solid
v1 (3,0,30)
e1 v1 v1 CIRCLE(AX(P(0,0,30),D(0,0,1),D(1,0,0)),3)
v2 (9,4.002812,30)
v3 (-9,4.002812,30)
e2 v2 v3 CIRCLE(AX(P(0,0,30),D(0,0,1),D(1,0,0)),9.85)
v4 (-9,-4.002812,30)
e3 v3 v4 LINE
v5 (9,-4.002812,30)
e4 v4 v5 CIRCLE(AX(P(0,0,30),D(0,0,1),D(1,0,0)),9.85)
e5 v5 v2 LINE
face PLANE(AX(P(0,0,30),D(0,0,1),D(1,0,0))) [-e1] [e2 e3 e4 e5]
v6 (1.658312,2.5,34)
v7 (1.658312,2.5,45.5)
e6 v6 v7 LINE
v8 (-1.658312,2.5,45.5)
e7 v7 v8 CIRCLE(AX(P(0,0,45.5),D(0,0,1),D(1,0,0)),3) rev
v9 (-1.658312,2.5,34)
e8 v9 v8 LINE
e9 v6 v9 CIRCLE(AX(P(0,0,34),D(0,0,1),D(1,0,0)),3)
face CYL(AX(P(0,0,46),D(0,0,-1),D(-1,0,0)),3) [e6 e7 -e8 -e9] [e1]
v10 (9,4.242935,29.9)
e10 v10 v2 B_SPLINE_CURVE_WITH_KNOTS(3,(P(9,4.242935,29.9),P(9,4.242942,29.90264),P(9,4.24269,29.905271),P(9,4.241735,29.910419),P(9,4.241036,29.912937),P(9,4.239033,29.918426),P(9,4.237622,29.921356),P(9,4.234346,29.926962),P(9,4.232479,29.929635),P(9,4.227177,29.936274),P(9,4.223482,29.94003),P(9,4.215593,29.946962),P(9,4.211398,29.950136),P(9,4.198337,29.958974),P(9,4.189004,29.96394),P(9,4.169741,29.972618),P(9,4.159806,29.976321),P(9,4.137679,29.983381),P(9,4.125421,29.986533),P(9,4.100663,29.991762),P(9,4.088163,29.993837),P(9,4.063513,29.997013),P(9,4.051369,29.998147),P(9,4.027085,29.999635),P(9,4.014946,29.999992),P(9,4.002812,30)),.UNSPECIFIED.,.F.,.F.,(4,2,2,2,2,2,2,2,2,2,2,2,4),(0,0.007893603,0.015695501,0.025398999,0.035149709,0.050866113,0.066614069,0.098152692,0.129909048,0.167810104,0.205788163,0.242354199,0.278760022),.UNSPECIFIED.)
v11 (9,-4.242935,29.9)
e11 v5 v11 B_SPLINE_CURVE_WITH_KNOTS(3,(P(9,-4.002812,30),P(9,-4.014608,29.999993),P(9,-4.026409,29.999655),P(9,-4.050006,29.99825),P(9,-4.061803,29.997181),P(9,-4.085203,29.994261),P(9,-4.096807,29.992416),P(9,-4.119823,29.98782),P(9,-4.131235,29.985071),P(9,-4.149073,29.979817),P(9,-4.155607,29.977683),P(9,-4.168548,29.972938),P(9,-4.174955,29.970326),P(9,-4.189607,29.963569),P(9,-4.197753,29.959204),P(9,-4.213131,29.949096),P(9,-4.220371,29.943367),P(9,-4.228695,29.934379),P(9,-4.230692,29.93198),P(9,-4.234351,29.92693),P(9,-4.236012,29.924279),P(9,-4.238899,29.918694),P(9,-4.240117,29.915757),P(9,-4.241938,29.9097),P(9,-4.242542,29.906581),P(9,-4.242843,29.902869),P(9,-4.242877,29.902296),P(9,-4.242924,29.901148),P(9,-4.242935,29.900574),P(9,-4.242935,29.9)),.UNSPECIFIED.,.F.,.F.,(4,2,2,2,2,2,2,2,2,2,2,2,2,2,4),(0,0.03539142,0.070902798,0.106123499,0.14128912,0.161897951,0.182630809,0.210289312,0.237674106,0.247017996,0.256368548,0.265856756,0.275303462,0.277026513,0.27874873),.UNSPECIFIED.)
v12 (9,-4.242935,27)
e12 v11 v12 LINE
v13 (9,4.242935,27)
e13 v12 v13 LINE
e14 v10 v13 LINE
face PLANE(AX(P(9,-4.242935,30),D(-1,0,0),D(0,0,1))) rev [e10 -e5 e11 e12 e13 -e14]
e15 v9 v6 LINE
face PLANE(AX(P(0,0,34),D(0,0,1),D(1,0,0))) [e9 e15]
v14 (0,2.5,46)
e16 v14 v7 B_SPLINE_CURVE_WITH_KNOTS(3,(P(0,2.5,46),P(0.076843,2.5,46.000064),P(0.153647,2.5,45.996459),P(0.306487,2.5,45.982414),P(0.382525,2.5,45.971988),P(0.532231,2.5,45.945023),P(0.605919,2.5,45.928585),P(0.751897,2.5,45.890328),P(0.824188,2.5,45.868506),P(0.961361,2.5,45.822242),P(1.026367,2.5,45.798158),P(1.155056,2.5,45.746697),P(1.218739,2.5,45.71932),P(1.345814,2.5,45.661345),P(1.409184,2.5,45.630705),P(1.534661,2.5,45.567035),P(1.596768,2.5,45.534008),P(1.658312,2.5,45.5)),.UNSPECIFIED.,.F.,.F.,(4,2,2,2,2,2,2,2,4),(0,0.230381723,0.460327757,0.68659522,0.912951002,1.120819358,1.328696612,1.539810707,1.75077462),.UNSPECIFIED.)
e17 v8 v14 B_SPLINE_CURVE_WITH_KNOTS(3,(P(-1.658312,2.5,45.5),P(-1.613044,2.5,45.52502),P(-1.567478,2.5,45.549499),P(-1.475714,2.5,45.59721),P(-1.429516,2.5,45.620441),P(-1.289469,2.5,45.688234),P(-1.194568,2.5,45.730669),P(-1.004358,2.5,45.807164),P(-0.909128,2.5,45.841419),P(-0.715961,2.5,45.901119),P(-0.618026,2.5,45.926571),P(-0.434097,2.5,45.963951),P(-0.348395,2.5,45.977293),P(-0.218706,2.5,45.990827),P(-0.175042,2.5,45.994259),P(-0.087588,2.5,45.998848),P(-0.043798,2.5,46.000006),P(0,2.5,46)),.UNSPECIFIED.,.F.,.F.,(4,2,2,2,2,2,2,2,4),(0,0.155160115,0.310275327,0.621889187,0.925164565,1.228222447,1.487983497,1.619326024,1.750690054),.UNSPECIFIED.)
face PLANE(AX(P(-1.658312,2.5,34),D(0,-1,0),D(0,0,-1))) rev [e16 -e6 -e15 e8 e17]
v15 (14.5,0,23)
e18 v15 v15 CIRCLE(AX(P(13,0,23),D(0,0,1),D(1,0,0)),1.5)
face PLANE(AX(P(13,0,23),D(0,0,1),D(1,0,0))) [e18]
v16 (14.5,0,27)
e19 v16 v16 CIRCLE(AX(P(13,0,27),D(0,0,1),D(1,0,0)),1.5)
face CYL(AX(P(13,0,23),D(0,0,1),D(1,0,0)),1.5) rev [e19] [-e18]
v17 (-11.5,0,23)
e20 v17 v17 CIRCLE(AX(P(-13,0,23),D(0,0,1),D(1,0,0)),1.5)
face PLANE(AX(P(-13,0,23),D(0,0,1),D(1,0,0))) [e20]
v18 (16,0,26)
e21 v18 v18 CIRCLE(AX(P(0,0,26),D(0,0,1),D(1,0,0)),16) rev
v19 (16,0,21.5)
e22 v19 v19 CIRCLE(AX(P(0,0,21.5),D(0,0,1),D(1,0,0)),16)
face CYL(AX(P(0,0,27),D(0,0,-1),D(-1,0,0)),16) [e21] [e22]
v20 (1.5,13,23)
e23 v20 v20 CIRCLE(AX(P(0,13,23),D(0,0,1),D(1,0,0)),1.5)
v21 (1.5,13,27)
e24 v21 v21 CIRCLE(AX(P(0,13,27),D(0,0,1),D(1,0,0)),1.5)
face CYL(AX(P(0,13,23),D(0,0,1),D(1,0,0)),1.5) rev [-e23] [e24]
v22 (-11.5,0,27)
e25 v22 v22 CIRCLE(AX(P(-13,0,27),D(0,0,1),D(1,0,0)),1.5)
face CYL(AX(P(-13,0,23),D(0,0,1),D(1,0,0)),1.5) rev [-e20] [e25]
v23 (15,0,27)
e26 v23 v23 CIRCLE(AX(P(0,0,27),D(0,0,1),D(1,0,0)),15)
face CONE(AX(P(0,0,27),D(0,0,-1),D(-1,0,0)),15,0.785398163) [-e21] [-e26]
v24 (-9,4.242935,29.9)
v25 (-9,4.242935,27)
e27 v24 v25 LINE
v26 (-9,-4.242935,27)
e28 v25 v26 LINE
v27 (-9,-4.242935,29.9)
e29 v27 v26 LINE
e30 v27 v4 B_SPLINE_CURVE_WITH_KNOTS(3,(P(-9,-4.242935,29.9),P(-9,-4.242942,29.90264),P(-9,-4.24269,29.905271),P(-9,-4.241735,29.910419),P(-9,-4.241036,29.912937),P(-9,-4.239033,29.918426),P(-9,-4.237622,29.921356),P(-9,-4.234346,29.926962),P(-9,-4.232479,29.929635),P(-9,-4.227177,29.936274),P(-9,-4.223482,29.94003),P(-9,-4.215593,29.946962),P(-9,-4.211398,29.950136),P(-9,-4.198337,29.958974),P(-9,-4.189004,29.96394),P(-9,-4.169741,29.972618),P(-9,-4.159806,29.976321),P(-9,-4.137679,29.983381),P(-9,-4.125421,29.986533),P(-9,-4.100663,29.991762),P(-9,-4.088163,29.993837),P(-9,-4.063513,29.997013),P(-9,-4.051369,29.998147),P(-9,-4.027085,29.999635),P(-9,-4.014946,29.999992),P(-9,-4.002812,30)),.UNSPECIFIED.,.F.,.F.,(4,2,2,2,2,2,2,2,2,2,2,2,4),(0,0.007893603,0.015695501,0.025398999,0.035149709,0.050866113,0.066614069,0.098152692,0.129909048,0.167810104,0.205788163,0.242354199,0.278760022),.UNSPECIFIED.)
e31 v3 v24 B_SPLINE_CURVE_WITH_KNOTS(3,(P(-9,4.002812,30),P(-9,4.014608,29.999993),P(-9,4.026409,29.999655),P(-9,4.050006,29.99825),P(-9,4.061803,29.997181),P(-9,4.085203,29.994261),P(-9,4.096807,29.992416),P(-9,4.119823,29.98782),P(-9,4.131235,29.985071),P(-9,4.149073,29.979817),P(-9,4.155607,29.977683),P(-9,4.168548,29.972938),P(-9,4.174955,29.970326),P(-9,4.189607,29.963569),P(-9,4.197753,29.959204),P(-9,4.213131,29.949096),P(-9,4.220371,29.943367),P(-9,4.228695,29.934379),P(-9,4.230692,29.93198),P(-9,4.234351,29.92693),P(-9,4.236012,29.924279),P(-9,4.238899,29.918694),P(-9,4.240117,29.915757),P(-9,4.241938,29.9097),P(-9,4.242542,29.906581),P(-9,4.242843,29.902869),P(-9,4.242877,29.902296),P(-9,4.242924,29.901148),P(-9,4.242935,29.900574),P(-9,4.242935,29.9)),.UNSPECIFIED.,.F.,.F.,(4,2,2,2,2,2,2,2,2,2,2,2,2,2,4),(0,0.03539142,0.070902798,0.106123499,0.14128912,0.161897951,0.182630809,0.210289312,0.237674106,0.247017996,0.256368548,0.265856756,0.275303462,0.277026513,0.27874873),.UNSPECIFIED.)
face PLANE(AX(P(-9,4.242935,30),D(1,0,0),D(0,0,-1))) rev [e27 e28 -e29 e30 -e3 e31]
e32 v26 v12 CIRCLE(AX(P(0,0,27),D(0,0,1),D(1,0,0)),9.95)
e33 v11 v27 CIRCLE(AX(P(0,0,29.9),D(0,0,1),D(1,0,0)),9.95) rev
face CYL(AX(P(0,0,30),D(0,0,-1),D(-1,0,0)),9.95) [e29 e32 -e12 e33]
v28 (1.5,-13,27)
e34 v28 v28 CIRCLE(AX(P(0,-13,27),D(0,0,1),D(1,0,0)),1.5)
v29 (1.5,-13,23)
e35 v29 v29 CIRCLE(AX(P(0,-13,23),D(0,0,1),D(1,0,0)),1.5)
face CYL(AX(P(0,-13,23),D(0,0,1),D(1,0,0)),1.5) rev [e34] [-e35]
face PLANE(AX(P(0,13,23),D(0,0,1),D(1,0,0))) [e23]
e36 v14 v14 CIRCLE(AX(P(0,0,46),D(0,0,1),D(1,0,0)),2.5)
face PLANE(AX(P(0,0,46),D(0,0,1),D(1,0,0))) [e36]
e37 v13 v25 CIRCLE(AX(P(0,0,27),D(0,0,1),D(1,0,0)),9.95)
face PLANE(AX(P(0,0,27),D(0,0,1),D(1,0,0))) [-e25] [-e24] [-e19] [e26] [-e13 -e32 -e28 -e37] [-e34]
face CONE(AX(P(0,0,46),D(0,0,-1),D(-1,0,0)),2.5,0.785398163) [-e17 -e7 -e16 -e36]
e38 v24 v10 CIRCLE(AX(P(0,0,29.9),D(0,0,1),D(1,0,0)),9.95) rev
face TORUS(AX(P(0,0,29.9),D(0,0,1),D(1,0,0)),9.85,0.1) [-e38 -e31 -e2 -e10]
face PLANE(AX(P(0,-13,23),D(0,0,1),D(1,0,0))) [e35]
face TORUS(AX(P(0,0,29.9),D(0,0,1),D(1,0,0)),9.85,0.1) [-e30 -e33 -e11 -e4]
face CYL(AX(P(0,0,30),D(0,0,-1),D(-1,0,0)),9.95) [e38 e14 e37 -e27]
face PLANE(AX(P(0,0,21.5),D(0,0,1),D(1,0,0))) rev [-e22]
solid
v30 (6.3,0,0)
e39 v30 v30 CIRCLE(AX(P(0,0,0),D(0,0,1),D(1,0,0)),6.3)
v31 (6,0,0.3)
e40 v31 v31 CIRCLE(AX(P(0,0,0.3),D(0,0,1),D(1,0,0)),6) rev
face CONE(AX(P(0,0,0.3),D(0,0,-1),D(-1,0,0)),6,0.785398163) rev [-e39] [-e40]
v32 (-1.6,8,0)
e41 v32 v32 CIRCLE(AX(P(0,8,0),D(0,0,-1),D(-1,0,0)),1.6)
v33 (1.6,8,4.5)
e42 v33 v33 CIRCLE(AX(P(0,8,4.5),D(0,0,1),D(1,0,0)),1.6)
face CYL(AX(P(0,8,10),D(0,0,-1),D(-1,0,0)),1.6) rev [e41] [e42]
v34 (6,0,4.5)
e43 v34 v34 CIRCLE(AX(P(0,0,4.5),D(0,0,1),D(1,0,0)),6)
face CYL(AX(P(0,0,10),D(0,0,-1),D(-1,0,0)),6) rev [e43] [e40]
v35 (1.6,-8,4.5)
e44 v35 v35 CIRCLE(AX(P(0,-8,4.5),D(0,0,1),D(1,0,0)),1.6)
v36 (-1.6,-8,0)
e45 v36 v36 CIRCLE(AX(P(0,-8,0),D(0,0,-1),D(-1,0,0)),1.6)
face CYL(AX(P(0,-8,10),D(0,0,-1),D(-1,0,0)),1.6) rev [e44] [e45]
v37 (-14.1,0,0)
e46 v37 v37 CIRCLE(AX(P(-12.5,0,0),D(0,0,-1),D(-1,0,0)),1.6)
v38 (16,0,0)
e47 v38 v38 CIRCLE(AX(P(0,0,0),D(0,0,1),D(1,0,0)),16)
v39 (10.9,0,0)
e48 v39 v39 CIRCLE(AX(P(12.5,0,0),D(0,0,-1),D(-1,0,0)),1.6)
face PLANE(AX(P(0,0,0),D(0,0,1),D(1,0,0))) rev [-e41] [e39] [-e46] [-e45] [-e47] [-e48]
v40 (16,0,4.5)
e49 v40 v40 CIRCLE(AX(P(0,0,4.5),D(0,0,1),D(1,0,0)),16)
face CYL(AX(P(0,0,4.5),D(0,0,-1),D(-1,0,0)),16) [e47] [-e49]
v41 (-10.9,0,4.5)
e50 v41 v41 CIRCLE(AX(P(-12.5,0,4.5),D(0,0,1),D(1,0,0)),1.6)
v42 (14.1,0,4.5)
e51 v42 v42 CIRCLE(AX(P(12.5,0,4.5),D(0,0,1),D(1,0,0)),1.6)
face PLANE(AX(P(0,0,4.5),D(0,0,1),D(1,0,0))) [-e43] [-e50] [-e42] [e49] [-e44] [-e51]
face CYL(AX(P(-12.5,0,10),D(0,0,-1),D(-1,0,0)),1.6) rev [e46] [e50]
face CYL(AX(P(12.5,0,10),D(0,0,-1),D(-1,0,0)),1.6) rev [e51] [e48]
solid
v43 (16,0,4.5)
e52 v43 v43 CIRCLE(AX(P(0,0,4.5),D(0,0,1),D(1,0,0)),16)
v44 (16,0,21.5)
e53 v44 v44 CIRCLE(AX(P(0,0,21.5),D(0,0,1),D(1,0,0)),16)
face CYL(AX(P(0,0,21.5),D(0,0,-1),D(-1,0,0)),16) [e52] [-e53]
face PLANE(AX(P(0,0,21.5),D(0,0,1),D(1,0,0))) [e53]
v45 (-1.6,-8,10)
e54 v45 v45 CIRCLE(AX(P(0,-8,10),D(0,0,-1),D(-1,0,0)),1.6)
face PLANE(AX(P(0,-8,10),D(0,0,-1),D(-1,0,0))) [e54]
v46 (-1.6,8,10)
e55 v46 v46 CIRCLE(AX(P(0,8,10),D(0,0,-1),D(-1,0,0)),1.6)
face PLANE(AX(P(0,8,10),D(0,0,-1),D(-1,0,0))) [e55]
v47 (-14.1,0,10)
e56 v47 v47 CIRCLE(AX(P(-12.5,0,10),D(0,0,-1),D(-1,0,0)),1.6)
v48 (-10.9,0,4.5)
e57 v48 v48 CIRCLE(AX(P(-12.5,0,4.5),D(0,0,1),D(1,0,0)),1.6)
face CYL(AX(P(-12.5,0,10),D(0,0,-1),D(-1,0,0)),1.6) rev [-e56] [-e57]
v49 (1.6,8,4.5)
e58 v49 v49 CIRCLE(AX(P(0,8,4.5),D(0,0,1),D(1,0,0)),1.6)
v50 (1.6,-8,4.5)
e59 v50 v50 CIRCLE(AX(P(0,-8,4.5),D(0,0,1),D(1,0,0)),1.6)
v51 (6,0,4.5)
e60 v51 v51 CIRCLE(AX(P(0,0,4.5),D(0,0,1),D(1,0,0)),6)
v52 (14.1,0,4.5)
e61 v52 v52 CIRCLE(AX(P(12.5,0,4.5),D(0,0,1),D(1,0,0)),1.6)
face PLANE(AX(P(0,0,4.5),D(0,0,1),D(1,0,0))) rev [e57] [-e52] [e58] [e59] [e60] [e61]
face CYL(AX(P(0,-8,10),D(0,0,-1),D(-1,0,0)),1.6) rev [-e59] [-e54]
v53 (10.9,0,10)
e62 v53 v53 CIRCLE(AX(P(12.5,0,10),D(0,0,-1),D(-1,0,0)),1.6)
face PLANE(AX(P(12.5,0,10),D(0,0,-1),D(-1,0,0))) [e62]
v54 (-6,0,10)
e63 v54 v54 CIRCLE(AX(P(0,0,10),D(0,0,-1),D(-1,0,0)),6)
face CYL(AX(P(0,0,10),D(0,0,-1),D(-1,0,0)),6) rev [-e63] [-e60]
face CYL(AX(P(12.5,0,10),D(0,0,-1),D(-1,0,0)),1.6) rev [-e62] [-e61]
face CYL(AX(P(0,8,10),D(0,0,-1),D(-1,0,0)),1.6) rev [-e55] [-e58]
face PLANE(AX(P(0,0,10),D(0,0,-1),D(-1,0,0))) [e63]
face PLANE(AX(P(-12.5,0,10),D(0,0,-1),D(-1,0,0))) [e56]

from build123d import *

# Parameters (mm, degrees)
SKETCH_1_R          = 16
EXTRUDE_1_DEPTH     = 4.5
SKETCH_2_R          = 16
EXTRUDE_2_DEPTH     = 17
SKETCH_3_R          = 16
EXTRUDE_3_DEPTH     = 5.5
CHAMFER_1_SIZE      = 1
EXTRUDE_4_DEPTH     = 3
FILLET_1_R          = 0.1
SKETCH_5_R          = 3
EXTRUDE_5_DEPTH     = 16
CUT_EXTRUDE_1_DEPTH = 12
CHAMFER_2_SIZE      = 0.5
SKETCH_7_R          = 1.5
CUT_EXTRUDE_2_DEPTH = 4
SKETCH_8_R          = 6
SKETCH_8_R_2        = 1.6
CUT_EXTRUDE_3_DEPTH = 10
CHAMFER_3_SIZE      = 0.3


with BuildPart() as part:
    # ｽｹｯﾁ1 → ﾎﾞｽ - 押し出し1 (new body)
    with BuildSketch(Plane.XY):
        Circle(SKETCH_1_R)
    extrude(amount=EXTRUDE_1_DEPTH)


with BuildPart() as body_2:
    # ｽｹｯﾁ2 → ﾎﾞｽ - 押し出し2 (new body)
    with BuildSketch(Plane.XY.offset(4.5)):
        Circle(SKETCH_2_R)
    extrude(amount=EXTRUDE_2_DEPTH)


with BuildPart() as body_3:
    # ｽｹｯﾁ3 → ﾎﾞｽ - 押し出し3 (new body)
    with BuildSketch(Plane.XY.offset(21.5)):
        Circle(SKETCH_3_R)
    extrude(amount=EXTRUDE_3_DEPTH)

    # 面取り1
    chamfer_1_edges = [body_3.edges().sort_by_distance(p)[0] for p in [
        (-16, 0, 27),
    ]]
    chamfer(chamfer_1_edges, length=CHAMFER_1_SIZE)

    # ｽｹｯﾁ4 → ﾎﾞｽ - 押し出し4 (add)
    with BuildSketch(Plane.XY.offset(27)):
        with BuildLine():
            Line((-9, 4.242935305), (-9, -4.242935305))
            ThreePointArc((-9, -4.242935305), (0, -9.95), (9, -4.242935305))
            Line((9, -4.242935305), (9, 4.242935305))
            ThreePointArc((9, 4.242935305), (0, 9.95), (-9, 4.242935305))
        make_face()
    extrude(amount=EXTRUDE_4_DEPTH)

    # ﾌｨﾚｯﾄ1
    fillet_1_edges = [body_3.edges().sort_by_distance(p)[0] for p in [
        (0, 9.95, 30),
        (0, -9.95, 30),
    ]]
    fillet(fillet_1_edges, radius=FILLET_1_R)

    # ｽｹｯﾁ5 → ﾎﾞｽ - 押し出し5 (add)
    with BuildSketch(Plane.XY.offset(30)):
        Circle(SKETCH_5_R)
    extrude(amount=EXTRUDE_5_DEPTH)

    # ｽｹｯﾁ6 → ｶｯﾄ - 押し出し1 (cut)
    with BuildSketch(Plane.XY.offset(46)):
        with BuildLine():
            Line((-1.658312395, 2.5), (1.658312395, 2.5))
            ThreePointArc((1.658312395, 2.5), (0, 3), (-1.658312395, 2.5))
        make_face()
    extrude(amount=-CUT_EXTRUDE_1_DEPTH, mode=Mode.SUBTRACT)

    # 面取り2
    chamfer_2_edges = [body_3.edges().sort_by_distance(p)[0] for p in [
        (-1.418637165, -2.643382037, 46),
    ]]
    chamfer(chamfer_2_edges, length=CHAMFER_2_SIZE - 0.0001)  # a hair under: the kernel refuses the full size

    # ｽｹｯﾁ7 → ｶｯﾄ - 押し出し2 (cut)
    with BuildSketch(Plane.XY.offset(27)):
        with Locations((0, 13)):
            Circle(SKETCH_7_R)
        with Locations((13, 0)):
            Circle(SKETCH_7_R)
        with Locations((0, -13)):
            Circle(SKETCH_7_R)
        with Locations((-13, 0)):
            Circle(SKETCH_7_R)
    extrude(amount=-CUT_EXTRUDE_2_DEPTH, mode=Mode.SUBTRACT)


with BuildPart() as cut_extrude_3_tool:
    # ｽｹｯﾁ8 → ｶｯﾄ - 押し出し3 (new body)
    with BuildSketch(Plane(origin=(0, 0, 0), x_dir=(-1, 0, 0), z_dir=(0, 0, -1))):
        Circle(SKETCH_8_R)
        with Locations((12.5, 0)):
            Circle(SKETCH_8_R_2)
        with Locations((-12.5, 0)):
            Circle(SKETCH_8_R_2)
        with Locations((0, 8)):
            Circle(SKETCH_8_R_2)
        with Locations((0, -8)):
            Circle(SKETCH_8_R_2)
    extrude(amount=-CUT_EXTRUDE_3_DEPTH)


with BuildPart() as part_1:
    add(part.part)

    # ｶｯﾄ - 押し出し3: cut by cut_extrude_3_tool
    add(cut_extrude_3_tool.part, mode=Mode.SUBTRACT)

    # 面取り3
    chamfer_3_edges = [part_1.edges().sort_by_distance(p)[0] for p in [
        (6, 0, 0),
    ]]
    chamfer(chamfer_3_edges, length=CHAMFER_3_SIZE)


with BuildPart() as body_2_1:
    add(body_2.part)

    # ｶｯﾄ - 押し出し3: cut by cut_extrude_3_tool
    add(cut_extrude_3_tool.part, mode=Mode.SUBTRACT)


solid = Compound([body_3.part, part_1.part, body_2_1.part])
